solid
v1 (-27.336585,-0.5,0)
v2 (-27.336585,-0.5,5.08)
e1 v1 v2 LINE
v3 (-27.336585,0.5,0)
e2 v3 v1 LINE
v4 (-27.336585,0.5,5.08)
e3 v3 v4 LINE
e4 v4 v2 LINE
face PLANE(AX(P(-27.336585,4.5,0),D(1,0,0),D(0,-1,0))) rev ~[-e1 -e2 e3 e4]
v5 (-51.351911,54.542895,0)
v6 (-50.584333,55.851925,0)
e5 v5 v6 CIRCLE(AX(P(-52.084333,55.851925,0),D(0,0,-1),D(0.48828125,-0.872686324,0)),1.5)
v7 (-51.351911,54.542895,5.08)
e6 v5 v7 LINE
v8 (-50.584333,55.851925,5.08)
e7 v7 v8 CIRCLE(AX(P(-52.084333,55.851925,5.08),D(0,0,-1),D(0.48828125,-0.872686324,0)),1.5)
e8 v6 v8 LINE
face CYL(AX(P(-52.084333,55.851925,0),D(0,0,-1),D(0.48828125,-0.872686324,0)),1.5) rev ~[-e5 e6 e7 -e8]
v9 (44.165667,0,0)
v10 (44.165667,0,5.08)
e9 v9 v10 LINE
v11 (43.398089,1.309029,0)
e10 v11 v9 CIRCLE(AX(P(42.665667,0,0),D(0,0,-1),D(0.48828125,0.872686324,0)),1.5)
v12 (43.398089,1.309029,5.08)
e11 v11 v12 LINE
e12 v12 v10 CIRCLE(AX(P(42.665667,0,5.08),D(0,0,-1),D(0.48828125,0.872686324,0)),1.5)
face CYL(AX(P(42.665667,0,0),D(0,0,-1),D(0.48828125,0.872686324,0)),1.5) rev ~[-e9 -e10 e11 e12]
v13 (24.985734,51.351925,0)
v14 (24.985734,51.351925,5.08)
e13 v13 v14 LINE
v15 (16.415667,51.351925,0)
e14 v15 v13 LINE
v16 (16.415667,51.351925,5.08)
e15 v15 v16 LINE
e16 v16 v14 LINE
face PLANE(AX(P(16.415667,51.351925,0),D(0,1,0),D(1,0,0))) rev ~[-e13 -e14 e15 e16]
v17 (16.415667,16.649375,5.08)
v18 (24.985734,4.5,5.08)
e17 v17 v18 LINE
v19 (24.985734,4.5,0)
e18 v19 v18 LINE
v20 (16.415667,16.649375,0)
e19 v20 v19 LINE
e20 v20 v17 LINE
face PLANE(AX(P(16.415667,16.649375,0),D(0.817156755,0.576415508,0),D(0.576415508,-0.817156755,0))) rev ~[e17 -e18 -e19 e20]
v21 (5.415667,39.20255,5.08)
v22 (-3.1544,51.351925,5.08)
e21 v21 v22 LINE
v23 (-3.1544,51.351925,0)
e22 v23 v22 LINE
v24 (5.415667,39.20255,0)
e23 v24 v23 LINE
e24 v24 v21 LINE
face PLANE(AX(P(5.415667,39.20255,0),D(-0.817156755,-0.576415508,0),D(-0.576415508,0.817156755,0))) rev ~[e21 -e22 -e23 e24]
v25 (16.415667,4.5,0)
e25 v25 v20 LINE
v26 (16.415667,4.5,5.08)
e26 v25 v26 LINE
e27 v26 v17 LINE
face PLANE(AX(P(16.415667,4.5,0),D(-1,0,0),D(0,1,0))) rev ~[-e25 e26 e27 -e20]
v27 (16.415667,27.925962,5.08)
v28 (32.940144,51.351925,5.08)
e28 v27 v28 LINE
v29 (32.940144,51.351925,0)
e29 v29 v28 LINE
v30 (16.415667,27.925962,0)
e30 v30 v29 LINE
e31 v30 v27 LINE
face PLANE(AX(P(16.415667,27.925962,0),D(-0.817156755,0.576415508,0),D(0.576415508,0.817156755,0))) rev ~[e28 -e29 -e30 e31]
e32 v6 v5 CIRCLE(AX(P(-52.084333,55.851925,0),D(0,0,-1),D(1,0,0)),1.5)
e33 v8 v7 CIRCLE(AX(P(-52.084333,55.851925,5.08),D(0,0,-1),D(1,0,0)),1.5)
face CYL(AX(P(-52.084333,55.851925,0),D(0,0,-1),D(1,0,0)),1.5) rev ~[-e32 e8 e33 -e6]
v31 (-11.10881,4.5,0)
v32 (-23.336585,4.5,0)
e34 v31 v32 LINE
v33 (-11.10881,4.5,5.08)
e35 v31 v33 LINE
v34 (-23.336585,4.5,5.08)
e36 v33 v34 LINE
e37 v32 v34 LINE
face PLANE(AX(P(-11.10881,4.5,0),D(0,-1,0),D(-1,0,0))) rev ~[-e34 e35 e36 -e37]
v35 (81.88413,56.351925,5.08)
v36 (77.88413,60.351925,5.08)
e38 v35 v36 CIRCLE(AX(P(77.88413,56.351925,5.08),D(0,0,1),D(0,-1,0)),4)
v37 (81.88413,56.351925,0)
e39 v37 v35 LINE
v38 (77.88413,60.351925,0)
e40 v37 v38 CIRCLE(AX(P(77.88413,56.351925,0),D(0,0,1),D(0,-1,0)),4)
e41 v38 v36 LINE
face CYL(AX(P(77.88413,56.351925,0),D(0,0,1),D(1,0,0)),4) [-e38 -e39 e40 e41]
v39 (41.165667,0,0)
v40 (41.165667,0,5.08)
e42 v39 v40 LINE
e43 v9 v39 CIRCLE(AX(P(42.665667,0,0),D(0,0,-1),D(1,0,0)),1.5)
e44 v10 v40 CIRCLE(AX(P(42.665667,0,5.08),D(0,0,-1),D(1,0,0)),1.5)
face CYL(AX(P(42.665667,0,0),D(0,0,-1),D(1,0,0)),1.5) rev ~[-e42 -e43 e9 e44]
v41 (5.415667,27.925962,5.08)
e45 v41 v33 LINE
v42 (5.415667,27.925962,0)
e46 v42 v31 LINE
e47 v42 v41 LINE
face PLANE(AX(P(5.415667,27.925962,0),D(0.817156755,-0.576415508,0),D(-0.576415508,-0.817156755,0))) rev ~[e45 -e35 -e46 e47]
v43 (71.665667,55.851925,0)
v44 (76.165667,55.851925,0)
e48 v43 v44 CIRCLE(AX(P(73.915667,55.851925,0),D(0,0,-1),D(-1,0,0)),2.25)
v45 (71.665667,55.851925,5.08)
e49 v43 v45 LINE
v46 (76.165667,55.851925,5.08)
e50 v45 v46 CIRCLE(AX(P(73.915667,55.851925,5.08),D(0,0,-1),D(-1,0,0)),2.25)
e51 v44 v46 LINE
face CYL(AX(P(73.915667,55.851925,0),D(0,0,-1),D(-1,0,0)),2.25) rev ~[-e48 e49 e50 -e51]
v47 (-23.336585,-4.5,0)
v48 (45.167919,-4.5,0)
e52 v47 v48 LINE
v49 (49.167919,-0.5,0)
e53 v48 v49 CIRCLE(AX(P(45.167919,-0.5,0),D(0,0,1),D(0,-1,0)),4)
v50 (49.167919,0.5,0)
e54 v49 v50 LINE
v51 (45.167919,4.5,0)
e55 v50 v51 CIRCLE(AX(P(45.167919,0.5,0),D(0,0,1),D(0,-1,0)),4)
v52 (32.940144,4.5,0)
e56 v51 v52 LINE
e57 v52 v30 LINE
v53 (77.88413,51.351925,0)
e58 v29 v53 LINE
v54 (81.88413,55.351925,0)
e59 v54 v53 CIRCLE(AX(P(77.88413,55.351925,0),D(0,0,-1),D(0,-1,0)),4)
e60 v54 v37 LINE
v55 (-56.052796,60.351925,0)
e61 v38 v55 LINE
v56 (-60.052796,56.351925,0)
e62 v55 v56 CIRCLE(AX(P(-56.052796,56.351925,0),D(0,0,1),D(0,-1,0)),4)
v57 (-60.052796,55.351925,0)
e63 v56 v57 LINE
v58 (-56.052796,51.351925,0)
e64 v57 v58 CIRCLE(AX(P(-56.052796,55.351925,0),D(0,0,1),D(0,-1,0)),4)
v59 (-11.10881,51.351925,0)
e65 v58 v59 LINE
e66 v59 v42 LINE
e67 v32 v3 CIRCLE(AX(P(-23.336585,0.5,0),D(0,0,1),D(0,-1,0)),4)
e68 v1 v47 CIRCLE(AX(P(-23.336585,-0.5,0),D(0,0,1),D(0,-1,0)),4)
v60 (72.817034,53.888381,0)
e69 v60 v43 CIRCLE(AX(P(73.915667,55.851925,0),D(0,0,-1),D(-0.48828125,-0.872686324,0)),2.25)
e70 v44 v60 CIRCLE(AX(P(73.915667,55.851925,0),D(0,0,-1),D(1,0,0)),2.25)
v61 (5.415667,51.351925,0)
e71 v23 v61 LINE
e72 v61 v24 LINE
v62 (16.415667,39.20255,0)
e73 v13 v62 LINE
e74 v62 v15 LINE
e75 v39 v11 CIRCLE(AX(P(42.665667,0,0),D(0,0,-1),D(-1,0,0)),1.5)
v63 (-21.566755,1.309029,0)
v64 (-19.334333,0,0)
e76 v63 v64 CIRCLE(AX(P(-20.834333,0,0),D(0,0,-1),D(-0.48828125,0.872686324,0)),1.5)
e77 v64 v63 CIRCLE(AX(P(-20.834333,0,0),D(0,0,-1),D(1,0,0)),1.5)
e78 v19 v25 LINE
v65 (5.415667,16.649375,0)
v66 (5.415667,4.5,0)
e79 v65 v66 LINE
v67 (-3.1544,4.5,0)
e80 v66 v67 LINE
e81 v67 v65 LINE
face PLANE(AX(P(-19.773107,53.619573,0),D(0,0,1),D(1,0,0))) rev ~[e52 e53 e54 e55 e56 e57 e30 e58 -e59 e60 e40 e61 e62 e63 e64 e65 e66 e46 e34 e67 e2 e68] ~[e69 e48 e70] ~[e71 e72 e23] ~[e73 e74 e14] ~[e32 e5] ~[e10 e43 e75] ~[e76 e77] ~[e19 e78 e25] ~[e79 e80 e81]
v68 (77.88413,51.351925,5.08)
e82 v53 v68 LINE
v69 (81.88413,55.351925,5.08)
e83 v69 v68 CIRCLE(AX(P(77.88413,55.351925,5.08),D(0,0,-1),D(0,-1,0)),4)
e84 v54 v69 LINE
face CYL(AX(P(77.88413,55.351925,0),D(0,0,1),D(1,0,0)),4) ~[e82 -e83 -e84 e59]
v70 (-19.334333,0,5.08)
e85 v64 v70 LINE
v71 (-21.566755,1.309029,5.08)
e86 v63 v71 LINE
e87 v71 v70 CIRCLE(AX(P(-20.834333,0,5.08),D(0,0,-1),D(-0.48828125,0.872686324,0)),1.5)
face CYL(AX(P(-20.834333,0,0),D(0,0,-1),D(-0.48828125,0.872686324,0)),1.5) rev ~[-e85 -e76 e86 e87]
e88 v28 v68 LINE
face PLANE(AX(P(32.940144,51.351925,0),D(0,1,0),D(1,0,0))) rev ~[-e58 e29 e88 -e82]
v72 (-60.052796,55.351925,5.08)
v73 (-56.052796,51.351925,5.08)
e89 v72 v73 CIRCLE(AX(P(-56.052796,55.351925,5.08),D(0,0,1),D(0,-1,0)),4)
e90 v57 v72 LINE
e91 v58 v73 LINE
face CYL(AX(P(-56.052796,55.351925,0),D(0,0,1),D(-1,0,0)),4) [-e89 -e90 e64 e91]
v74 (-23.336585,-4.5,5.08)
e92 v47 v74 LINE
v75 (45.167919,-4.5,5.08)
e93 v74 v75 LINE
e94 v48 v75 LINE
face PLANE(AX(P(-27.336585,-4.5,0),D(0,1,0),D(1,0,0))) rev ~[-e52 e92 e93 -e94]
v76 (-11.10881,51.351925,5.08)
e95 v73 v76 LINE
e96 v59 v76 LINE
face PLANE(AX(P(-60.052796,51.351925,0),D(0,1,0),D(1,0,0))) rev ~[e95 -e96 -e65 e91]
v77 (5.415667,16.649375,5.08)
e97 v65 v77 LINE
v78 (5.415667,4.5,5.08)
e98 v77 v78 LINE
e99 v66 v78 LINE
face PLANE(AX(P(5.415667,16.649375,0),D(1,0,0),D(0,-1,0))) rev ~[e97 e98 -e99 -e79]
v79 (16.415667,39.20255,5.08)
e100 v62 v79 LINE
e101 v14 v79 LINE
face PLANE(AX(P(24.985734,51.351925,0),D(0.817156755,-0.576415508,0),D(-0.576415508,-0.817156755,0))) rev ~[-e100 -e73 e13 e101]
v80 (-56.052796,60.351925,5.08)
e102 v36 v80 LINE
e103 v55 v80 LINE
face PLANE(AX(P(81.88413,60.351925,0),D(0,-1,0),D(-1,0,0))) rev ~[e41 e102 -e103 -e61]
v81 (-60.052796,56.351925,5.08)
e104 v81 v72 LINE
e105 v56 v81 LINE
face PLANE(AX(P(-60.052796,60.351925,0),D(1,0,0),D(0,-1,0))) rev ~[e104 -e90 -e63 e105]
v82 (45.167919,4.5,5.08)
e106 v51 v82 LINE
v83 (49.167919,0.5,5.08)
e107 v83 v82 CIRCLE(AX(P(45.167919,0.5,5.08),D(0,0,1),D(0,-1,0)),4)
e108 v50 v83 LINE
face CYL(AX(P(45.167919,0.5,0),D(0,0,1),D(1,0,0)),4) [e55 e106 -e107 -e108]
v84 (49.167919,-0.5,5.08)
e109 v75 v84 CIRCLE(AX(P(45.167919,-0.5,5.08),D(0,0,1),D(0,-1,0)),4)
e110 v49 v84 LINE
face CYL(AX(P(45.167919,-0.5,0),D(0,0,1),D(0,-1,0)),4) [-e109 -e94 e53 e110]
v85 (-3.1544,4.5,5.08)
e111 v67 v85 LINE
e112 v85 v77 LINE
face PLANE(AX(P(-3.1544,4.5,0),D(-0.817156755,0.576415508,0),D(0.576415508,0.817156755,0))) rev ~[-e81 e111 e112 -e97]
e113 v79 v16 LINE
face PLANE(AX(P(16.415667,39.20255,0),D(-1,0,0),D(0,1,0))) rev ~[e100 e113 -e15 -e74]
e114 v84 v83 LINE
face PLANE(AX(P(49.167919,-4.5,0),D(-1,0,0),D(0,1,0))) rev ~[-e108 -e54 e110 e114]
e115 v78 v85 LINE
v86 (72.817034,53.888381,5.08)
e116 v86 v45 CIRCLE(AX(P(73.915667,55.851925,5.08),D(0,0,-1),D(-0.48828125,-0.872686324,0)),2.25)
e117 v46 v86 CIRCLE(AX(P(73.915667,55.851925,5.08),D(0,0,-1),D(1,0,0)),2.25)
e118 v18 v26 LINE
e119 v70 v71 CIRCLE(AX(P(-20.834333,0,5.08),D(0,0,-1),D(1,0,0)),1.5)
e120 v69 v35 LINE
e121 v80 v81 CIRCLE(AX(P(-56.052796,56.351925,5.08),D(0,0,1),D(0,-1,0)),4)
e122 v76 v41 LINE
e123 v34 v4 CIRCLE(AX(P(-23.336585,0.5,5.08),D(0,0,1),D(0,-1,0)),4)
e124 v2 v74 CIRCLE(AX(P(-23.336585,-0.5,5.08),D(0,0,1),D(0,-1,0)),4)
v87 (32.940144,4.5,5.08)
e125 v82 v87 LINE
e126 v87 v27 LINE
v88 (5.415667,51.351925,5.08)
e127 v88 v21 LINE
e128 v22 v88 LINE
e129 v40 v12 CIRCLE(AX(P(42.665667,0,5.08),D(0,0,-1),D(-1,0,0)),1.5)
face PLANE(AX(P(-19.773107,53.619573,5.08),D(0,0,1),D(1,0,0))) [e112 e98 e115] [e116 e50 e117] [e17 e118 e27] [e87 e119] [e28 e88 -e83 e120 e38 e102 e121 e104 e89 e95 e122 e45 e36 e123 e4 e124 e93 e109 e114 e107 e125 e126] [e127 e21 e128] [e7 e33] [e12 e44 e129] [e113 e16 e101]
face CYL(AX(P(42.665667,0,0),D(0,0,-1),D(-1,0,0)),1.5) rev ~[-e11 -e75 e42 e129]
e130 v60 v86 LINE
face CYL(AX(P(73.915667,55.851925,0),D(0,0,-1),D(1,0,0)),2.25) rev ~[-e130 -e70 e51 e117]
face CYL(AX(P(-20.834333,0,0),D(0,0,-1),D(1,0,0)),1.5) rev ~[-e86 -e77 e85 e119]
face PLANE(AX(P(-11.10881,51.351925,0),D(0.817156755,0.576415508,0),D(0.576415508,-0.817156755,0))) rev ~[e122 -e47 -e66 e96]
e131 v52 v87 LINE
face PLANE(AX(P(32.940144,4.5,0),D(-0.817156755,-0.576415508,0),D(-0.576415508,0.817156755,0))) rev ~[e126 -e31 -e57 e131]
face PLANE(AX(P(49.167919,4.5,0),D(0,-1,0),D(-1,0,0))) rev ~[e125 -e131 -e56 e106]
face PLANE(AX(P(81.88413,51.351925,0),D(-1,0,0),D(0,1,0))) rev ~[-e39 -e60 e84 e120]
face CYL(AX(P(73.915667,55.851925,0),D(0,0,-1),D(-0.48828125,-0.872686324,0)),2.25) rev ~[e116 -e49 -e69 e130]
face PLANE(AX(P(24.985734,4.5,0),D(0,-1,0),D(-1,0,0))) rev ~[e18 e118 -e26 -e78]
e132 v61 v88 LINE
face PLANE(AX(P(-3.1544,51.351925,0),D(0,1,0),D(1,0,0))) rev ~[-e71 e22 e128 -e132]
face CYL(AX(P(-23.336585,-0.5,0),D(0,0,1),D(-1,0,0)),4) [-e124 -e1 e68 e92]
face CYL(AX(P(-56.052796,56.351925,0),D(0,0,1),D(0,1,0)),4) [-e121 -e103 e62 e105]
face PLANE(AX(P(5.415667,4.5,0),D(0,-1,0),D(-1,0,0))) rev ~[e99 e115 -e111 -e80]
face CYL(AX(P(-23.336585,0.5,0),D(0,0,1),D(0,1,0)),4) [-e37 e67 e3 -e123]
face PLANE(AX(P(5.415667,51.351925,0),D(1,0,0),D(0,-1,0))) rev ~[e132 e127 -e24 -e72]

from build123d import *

# Parameters (mm, degrees)
F1_DEPTH = 5.08
F2_R     = 4


# Not quite as in the source:
# - a feature names something its author has since deleted; it is built from what else it names


with BuildPart() as f1:
    # F0 (on Top) → F1 (new body)
    with BuildSketch(Plane.XY):
        with BuildLine():
            Line((10.9156670719, 55.8519247654), (-50.5843329281, 55.8519247654))
            ThreePointArc((-50.5843329281, 55.8519247654), (-50.7903791398, 55.0931866065), (-51.3519110531, 54.5428952787))
            Line((-51.3519110531, 54.5428952787), (-49.566514597, 51.3519247654))
            Line((-49.566514597, 51.3519247654), (-11.1088099211, 51.3519247654))
            Line((-11.1088099211, 51.3519247654), (-3.1543997556, 51.3519247654))
            Line((-3.1543997556, 51.3519247654), (5.4156670719, 51.3519247654))
            Line((5.4156670719, 51.3519247654), (10.9156670719, 51.3519247654))
            Line((10.9156670719, 51.3519247654), (10.9156670719, 55.8519247654))
        make_face()
        with BuildLine():
            Line((-11.1088099211, 4.5), (-23.3521512592, 4.5))
            Line((-23.3521512592, 4.5), (-21.5667548031, 1.3090294867))
            ThreePointArc((-21.5667548031, 1.3090294867), (-20.0755947692, 1.2939537883), (-19.3343329281, 0))
            Line((-19.3343329281, 0), (10.9156670719, 0))
            Line((10.9156670719, 0), (10.9156670719, 4.5))
            Line((10.9156670719, 4.5), (5.4156670719, 4.5))
            Line((5.4156670719, 4.5), (-3.1543997556, 4.5))
            Line((-3.1543997556, 4.5), (-11.1088099211, 4.5))
        make_face()
        with BuildLine():
            ThreePointArc((-51.3519110531, 54.5428952787), (-53.3782867164, 56.6106629243), (-50.5843329281, 55.8519247654))
            Line((-50.5843329281, 55.8519247654), (10.9156670719, 55.8519247654))
            Line((10.9156670719, 55.8519247654), (71.6656670719, 55.8519247654))
            ThreePointArc((71.6656670719, 55.8519247654), (73.9156670719, 58.1019247654), (76.1656670719, 55.8519247654))
            ThreePointArc((76.1656670719, 55.8519247654), (75.0537743102, 53.910994083), (72.8170342594, 53.8883805354))
            Line((72.8170342594, 53.8883805354), (71.3978487408, 51.3519247654))
            Line((71.3978487408, 51.3519247654), (81.8841302488, 51.3519247654))
            Line((81.8841302488, 51.3519247654), (81.8841302488, 60.3519247654))
            Line((81.8841302488, 60.3519247654), (-60.052796105, 60.3519247654))
            Line((-60.052796105, 60.3519247654), (-60.052796105, 51.3519247654))
            Line((-60.052796105, 51.3519247654), (-49.566514597, 51.3519247654))
            Line((-49.566514597, 51.3519247654), (-51.3519110531, 54.5428952787))
        make_face()
        with BuildLine():
            Line((-21.5667548031, 1.3090294867), (-23.3521512592, 4.5))
            Line((-23.3521512592, 4.5), (-27.3365851734, 4.5))
            Line((-27.3365851734, 4.5), (-27.3365851734, -4.5))
            Line((-27.3365851734, -4.5), (49.1679193172, -4.5))
            Line((49.1679193172, -4.5), (49.1679193172, 4.5))
            Line((49.1679193172, 4.5), (45.183485403, 4.5))
            Line((45.183485403, 4.5), (43.3980889469, 1.3090294867))
            ThreePointArc((43.3980889469, 1.3090294867), (43.9596208602, 0.7587381589), (44.1656670719, 0))
            ThreePointArc((44.1656670719, 0), (42.6656670719, -1.5), (41.1656670719, 0))
            Line((41.1656670719, 0), (10.9156670719, 0))
            Line((10.9156670719, 0), (-19.3343329281, 0))
            ThreePointArc((-19.3343329281, 0), (-21.593071087, -1.2939537883), (-21.5667548031, 1.3090294867))
        make_face()
        with BuildLine():
            Line((16.4156670719, 4.5), (10.9156670719, 4.5))
            Line((10.9156670719, 4.5), (10.9156670719, 0))
            Line((10.9156670719, 0), (41.1656670719, 0))
            ThreePointArc((41.1656670719, 0), (41.906928913, 1.2939537883), (43.3980889469, 1.3090294867))
            Line((43.3980889469, 1.3090294867), (45.183485403, 4.5))
            Line((45.183485403, 4.5), (32.9401440649, 4.5))
            Line((32.9401440649, 4.5), (24.9857338994, 4.5))
            Line((24.9857338994, 4.5), (16.4156670719, 4.5))
        make_face()
        with BuildLine():
            Line((71.6656670719, 55.8519247654), (10.9156670719, 55.8519247654))
            Line((10.9156670719, 55.8519247654), (10.9156670719, 51.3519247654))
            Line((10.9156670719, 51.3519247654), (16.4156670719, 51.3519247654))
            Line((16.4156670719, 51.3519247654), (24.9857338994, 51.3519247654))
            Line((24.9857338994, 51.3519247654), (32.9401440649, 51.3519247654))
            Line((32.9401440649, 51.3519247654), (71.3978487408, 51.3519247654))
            Line((71.3978487408, 51.3519247654), (72.8170342594, 53.8883805354))
            ThreePointArc((72.8170342594, 53.8883805354), (71.9747363894, 54.7138175271), (71.6656670719, 55.8519247654))
        make_face()
        Polygon((10.9156670719, 27.9259623827), (10.9156670719, 51.3519247654), (5.4156670719, 51.3519247654), (5.4156670719, 39.2025500407), (5.4156670719, 27.9259623827), align=None)
        Polygon((10.9156670719, 4.5), (10.9156670719, 27.9259623827), (5.4156670719, 27.9259623827), (5.4156670719, 16.6493747247), (5.4156670719, 4.5), align=None)
        Polygon((16.4156670719, 51.3519247654), (10.9156670719, 51.3519247654), (10.9156670719, 27.9259623827), (16.4156670719, 27.9259623827), (16.4156670719, 39.2025500407), align=None)
        Polygon((16.4156670719, 27.9259623827), (10.9156670719, 27.9259623827), (10.9156670719, 4.5), (16.4156670719, 4.5), (16.4156670719, 16.6493747247), align=None)
        Polygon((-3.1543997556, 51.3519247654), (-11.1088099211, 51.3519247654), (5.4156670719, 27.9259623827), (5.4156670719, 39.2025500407), align=None)
        Polygon((5.4156670719, 27.9259623827), (-11.1088099211, 4.5), (-3.1543997556, 4.5), (5.4156670719, 16.6493747247), align=None)
        Polygon((32.9401440649, 4.5), (16.4156670719, 27.9259623827), (16.4156670719, 16.6493747247), (24.9857338994, 4.5), align=None)
        Polygon((16.4156670719, 39.2025500407), (16.4156670719, 27.9259623827), (32.9401440649, 51.3519247654), (24.9857338994, 51.3519247654), align=None)
    extrude(amount=F1_DEPTH)

    # F2
    f2_edges = [f1.edges().sort_by_distance(p)[0] for p in [
        (-60.052796, 60.351925, 2.54),
        (-60.052796, 51.351925, 2.54),
        (81.88413, 60.351925, 2.54),
        (81.88413, 51.351925, 2.54),
        (49.167919, 4.5, 2.54),
        (49.167919, -4.5, 2.54),
        (-27.336585, 4.5, 2.54),
        (-27.336585, -4.5, 2.54),
    ]]
    fillet(f2_edges, radius=F2_R)


solid = f1.part
